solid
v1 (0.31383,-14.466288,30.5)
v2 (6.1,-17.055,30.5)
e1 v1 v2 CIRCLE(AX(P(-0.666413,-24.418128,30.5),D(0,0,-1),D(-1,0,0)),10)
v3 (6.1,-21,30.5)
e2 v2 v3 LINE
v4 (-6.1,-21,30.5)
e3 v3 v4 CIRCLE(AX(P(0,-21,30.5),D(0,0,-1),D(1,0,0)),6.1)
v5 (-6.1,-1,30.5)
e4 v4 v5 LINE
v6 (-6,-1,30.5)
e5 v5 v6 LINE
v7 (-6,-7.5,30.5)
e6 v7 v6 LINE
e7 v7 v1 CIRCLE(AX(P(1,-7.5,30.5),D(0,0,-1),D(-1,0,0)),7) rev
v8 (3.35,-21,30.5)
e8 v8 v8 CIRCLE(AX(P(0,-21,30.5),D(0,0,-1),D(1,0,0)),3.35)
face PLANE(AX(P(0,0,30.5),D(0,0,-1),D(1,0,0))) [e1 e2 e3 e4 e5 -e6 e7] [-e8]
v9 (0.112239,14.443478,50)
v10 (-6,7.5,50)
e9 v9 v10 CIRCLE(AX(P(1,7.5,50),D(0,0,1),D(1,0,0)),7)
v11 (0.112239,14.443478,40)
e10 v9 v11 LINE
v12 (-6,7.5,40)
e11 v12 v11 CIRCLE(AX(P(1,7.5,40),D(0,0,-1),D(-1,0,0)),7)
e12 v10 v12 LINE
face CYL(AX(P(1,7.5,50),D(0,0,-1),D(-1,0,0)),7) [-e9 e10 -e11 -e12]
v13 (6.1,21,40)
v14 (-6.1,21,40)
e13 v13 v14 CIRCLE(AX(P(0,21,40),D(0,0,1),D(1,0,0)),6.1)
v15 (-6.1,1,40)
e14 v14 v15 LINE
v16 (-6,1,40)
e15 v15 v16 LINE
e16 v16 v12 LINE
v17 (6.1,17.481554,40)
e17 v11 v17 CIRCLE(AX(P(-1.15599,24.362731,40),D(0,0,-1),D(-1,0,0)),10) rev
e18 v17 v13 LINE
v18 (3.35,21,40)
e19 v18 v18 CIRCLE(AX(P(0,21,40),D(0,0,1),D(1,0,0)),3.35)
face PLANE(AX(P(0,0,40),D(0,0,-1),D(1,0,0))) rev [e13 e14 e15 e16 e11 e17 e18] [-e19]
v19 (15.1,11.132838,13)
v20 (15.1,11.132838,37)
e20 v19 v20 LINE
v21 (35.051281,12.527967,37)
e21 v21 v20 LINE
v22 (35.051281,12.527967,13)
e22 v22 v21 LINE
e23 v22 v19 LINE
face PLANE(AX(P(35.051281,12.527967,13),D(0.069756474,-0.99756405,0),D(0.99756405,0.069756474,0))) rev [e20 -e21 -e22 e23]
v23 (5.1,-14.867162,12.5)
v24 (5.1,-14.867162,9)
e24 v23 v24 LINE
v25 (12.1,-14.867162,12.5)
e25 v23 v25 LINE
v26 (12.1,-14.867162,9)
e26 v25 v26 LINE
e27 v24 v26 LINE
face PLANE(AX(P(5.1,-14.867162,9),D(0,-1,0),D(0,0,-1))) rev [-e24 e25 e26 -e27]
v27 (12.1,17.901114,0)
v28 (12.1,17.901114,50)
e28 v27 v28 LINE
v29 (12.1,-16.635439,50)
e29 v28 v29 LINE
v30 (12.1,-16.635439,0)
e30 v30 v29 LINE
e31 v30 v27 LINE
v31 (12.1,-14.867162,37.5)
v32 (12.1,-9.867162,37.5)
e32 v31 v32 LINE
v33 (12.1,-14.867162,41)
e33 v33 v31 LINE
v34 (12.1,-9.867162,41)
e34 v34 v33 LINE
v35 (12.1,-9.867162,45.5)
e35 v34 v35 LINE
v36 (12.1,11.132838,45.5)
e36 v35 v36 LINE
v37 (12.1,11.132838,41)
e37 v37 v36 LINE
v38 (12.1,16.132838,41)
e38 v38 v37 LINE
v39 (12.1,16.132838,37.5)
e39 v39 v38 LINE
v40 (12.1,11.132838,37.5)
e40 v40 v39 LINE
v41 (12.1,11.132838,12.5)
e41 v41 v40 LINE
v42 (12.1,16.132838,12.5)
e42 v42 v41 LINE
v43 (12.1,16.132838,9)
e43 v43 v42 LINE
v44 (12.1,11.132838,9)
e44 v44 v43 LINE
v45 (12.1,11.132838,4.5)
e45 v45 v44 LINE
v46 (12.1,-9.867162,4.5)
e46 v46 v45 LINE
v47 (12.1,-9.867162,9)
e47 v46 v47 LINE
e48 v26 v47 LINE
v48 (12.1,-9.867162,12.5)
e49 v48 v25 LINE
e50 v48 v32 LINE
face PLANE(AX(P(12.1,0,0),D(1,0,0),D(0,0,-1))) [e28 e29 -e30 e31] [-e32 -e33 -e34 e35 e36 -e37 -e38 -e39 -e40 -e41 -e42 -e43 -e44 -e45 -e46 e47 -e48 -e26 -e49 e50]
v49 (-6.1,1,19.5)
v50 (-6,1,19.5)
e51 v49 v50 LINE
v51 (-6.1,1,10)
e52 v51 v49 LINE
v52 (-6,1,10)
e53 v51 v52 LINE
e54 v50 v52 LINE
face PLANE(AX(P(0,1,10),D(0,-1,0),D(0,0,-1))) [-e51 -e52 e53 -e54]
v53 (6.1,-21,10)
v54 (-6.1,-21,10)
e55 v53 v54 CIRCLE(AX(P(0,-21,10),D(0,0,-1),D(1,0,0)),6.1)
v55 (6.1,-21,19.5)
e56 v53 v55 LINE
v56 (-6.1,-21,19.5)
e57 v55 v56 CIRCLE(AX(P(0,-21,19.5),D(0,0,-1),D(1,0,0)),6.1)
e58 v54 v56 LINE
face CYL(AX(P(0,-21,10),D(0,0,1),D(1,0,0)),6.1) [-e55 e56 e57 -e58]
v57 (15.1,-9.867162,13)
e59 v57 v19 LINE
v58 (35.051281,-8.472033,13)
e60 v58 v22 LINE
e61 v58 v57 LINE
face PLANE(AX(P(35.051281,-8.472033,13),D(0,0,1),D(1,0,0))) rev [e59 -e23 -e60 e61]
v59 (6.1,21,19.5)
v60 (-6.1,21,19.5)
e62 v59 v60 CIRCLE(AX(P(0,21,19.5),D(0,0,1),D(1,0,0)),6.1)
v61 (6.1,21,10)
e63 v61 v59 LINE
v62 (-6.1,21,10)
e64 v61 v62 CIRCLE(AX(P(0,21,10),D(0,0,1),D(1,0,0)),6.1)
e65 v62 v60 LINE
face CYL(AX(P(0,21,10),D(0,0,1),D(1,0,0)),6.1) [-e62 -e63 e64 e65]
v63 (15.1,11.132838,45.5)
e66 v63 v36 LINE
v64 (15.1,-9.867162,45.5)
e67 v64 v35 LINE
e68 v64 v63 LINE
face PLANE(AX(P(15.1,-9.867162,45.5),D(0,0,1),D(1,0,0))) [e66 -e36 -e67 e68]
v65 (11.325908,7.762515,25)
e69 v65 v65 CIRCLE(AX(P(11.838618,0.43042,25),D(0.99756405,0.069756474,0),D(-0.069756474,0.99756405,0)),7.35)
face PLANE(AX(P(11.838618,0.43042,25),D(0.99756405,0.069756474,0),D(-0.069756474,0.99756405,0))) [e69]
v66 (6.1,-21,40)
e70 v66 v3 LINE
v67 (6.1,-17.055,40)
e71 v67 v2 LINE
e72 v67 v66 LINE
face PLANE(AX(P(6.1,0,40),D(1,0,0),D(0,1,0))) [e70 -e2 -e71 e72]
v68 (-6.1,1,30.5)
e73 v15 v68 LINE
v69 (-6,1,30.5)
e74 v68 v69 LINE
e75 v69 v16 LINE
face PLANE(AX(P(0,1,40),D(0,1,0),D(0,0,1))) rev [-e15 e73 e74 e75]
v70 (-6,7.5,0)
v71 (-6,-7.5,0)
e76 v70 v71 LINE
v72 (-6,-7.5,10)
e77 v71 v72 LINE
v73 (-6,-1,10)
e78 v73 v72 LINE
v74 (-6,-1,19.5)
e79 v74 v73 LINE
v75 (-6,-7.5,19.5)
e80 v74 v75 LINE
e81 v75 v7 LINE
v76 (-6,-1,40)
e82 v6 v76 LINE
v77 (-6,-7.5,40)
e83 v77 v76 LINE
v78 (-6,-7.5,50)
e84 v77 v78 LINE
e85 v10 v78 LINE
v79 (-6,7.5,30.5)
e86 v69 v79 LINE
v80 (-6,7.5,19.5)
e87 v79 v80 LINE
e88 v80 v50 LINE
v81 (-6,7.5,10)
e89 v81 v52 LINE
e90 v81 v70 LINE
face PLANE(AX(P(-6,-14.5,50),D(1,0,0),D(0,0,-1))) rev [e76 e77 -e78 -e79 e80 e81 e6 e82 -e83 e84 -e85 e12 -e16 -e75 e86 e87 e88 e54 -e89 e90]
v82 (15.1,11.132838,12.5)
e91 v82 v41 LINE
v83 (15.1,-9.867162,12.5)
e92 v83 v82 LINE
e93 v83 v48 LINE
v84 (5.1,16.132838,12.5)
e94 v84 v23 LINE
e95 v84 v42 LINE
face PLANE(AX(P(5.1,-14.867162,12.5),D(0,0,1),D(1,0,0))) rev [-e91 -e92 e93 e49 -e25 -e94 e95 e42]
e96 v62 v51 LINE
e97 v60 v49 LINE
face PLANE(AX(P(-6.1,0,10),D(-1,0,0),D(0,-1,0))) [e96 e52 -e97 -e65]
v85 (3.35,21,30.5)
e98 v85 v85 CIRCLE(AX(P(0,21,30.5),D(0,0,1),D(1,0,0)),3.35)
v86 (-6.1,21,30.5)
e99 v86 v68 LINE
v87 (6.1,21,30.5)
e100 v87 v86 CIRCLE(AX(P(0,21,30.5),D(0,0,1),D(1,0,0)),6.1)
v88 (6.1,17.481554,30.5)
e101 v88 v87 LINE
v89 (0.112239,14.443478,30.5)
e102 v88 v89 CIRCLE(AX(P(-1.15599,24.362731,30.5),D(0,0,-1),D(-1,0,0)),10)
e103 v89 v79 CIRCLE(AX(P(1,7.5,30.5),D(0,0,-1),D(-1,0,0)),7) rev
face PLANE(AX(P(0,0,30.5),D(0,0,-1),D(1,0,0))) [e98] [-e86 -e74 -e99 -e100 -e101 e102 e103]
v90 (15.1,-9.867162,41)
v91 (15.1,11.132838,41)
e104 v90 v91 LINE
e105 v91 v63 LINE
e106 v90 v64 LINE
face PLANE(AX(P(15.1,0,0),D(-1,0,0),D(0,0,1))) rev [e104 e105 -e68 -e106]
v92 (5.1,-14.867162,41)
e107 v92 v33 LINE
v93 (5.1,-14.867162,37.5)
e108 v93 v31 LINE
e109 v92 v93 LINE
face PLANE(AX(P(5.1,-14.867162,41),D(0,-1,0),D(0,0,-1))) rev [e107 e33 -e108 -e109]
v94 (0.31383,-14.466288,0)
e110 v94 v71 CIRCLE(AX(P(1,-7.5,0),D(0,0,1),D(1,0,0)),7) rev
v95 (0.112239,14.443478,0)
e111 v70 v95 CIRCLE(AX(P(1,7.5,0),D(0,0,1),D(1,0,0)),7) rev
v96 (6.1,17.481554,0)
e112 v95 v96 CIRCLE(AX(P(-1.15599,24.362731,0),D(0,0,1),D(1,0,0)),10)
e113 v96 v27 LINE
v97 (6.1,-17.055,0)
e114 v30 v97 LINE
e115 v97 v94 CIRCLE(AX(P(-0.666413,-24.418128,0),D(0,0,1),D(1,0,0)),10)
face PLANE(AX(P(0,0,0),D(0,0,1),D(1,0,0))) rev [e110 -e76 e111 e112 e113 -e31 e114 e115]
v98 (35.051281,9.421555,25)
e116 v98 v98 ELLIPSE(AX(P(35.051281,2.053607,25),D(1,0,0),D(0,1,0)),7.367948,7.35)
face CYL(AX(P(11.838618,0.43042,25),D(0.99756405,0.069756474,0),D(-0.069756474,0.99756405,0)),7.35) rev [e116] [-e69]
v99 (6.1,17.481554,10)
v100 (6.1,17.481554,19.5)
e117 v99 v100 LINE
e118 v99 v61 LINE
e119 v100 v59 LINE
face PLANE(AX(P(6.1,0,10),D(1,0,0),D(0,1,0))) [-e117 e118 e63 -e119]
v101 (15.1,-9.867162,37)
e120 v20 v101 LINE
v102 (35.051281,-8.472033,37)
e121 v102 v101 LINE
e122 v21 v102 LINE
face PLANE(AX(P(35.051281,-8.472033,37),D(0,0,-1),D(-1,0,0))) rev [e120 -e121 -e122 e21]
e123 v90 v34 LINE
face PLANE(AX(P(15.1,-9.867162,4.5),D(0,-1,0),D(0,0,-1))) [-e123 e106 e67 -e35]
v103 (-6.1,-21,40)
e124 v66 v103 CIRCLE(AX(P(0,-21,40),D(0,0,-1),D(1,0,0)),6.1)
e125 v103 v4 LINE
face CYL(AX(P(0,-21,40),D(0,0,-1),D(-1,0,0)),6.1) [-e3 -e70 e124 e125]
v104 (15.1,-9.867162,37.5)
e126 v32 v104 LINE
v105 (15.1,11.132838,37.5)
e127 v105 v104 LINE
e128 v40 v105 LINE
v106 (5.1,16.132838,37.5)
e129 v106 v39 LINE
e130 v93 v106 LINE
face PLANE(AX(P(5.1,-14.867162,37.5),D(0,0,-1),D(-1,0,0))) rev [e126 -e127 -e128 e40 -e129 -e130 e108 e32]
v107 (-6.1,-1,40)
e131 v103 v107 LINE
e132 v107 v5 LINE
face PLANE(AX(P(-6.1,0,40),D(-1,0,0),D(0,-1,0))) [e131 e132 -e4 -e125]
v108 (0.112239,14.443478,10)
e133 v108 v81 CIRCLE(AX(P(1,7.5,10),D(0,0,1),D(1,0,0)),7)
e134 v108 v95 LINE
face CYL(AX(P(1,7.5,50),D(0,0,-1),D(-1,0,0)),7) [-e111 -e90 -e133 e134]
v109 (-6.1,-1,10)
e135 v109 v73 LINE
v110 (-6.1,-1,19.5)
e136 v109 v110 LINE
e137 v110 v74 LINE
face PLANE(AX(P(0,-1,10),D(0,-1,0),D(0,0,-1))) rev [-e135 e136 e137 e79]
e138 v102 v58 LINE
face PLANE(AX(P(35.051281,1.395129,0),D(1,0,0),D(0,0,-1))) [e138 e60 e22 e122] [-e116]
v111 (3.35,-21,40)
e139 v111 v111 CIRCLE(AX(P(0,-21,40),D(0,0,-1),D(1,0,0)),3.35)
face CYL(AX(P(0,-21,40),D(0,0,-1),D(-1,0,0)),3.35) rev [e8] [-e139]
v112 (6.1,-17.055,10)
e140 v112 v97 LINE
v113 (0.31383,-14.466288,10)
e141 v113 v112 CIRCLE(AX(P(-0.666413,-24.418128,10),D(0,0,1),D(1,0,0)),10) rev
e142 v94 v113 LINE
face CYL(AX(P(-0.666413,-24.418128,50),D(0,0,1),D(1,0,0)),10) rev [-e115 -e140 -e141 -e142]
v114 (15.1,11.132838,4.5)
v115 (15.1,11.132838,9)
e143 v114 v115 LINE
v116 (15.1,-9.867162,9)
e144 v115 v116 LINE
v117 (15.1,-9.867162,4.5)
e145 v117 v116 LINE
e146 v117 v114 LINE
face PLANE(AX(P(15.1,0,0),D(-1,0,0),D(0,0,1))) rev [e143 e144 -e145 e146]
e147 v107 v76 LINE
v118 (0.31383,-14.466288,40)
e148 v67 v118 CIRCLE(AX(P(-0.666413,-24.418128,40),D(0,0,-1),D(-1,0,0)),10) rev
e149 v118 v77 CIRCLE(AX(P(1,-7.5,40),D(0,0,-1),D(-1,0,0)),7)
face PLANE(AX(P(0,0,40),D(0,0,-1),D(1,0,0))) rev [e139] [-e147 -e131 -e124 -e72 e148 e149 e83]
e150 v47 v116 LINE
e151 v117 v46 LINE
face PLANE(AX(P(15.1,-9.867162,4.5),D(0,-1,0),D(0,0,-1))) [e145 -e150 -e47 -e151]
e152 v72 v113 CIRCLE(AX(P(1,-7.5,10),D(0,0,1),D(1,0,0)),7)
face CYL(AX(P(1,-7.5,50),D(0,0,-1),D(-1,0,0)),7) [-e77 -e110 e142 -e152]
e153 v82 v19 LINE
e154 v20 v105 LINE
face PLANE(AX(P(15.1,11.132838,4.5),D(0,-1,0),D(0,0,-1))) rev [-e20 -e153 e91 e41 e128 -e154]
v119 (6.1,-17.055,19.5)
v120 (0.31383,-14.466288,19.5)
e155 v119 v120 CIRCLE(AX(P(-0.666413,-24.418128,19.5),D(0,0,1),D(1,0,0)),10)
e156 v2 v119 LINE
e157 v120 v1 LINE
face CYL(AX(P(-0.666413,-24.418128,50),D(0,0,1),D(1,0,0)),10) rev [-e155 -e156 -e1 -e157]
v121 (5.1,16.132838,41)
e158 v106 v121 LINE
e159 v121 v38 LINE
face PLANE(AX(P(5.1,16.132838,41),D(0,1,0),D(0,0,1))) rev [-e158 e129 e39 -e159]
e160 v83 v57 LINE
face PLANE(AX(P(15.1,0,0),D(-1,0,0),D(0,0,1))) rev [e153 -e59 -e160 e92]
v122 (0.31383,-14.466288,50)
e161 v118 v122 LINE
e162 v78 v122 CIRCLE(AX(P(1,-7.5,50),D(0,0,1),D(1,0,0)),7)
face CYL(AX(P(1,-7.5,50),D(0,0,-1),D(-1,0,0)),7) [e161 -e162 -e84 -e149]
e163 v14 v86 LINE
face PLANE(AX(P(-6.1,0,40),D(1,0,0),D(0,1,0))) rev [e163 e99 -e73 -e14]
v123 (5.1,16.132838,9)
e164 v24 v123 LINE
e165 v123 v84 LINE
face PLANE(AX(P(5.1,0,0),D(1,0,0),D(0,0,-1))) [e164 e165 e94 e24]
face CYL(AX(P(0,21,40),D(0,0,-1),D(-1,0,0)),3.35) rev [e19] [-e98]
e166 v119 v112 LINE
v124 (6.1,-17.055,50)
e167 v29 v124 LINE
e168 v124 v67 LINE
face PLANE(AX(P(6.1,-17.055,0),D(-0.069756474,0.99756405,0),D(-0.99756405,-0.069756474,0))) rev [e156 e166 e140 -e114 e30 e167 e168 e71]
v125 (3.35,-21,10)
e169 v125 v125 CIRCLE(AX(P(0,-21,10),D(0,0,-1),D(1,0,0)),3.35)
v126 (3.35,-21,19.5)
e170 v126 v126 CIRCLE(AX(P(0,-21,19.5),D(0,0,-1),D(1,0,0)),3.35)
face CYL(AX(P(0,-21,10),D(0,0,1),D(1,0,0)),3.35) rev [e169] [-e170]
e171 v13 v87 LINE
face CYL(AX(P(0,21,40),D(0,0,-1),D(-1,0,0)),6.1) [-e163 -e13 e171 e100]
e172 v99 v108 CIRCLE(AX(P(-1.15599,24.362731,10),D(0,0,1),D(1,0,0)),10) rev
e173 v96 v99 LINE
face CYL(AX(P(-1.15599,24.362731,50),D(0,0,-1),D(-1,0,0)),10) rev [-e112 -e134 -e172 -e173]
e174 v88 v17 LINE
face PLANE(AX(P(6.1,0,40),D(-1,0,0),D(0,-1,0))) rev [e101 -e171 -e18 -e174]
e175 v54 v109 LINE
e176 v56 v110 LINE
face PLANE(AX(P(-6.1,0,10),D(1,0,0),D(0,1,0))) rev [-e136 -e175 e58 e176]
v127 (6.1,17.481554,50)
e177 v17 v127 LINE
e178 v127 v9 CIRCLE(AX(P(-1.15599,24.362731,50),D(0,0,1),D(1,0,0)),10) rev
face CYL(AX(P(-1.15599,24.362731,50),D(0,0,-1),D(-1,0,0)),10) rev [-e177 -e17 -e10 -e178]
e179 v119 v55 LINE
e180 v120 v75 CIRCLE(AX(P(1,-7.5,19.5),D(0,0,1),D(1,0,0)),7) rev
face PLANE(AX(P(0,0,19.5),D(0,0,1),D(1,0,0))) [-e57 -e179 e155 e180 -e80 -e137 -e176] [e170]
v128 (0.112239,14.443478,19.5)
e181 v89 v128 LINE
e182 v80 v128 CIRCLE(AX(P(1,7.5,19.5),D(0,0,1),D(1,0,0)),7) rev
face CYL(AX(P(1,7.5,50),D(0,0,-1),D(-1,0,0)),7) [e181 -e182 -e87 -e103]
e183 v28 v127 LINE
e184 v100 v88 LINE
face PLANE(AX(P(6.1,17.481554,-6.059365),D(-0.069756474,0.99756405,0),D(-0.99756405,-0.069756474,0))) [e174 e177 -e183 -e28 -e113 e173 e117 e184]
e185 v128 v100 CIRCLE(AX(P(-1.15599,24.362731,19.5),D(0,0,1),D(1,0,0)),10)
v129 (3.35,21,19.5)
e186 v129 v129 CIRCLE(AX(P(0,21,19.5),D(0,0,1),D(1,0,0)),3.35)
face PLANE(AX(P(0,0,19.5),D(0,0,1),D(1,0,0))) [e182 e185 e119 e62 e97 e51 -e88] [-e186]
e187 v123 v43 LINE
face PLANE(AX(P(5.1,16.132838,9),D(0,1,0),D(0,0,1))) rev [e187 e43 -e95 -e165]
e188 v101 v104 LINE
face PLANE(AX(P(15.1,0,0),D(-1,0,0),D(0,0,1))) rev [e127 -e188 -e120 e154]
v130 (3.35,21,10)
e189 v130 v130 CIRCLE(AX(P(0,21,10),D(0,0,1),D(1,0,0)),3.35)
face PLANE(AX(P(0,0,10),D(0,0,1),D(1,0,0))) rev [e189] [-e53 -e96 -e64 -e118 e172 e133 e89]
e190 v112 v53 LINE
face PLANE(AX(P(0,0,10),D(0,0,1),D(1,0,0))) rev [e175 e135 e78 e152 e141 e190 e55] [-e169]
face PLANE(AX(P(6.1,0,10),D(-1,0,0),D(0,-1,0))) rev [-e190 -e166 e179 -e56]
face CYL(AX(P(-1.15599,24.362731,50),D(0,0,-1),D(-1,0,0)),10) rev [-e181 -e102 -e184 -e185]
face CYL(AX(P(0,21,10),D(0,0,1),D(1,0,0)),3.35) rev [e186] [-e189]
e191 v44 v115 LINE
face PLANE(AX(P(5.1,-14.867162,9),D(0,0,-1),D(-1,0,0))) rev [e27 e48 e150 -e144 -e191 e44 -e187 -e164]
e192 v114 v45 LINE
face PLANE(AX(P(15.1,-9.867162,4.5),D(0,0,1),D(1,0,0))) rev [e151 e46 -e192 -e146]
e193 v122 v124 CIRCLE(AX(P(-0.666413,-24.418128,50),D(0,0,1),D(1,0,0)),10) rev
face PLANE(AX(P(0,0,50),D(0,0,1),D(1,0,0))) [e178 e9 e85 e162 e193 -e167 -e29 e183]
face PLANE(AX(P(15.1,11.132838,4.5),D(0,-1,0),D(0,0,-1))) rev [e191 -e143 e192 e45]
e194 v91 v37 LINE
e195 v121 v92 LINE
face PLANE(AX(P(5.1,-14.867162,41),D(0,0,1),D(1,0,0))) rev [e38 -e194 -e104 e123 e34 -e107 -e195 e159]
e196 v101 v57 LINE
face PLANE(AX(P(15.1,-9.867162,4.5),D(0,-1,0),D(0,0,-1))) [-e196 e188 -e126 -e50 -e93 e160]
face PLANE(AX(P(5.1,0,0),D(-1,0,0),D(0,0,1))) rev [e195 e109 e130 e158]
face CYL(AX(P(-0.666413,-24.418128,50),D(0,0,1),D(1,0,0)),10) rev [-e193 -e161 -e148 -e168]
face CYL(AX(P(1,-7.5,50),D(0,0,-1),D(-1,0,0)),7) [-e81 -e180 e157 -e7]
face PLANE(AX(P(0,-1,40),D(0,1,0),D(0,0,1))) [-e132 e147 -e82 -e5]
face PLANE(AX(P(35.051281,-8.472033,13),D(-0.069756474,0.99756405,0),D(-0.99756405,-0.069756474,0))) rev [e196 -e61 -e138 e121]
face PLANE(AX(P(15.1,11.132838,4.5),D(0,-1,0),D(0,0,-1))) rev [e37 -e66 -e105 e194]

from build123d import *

# Parameters (mm, degrees)
SKETCH4_W               = 13
SKETCH4_H               = 29
BOSS_EXTRUDE1_DEPTH     = 50
SKETCH6_R               = 3.35
BOSS_EXTRUDE2_DEPTH     = 4.75
MIRROR2_COPY_1_SKETCH_R = 3.35
MIRROR2_COPY_1_DEPTH    = 4.75
FILLET2_R               = 7
SKETCH7_W               = 50
SKETCH7_H               = 34.11
BOSS_EXTRUDE3_DEPTH     = 6
BOSS_EXTRUDE4_REACH     = 60.145
CUT_EXTRUDE1_DEPTH      = 59.144819202
SKETCH10_W              = 41
SKETCH10_H              = 21
BOSS_EXTRUDE5_DEPTH     = 3
FILLET4_R               = 10
CUT_EXTRUDE2_DEPTH      = 60.713063897
CUT_EXTRUDE2_DEPTH_BACK = 7
SKETCH11_W              = 3.5
SKETCH11_H              = 31
SKETCH12_W              = 24
SKETCH12_H              = 21
BOSS_EXTRUDE7_DEPTH     = 20
SKETCH15_R              = 7.35
CUT_EXTRUDE3_DEPTH      = 24


with BuildPart() as part:
    # Sketch4 → Boss-Extrude1 (new body)
    with BuildSketch(Plane.XY):
        with Locations((0.5, 0)):
            Rectangle(SKETCH4_W, SKETCH4_H)
    extrude(amount=BOSS_EXTRUDE1_DEPTH)

    # Sketch6 → Boss-Extrude2 (add, symmetric)
    with BuildSketch(Plane.XY.offset(14.75)):
        with BuildLine():
            Line((6.1, 1), (6.1, 21))
            ThreePointArc((6.1, 21), (0, 27.1), (-6.1, 21))
            Line((-6.1, 21), (-6.1, 1))
            Line((-6.1, 1), (6.1, 1))
        make_face()
        with Locations((0, 21)):
            Circle(SKETCH6_R, mode=Mode.SUBTRACT)
    boss_extrude2 = extrude(amount=BOSS_EXTRUDE2_DEPTH, both=True)

    # Mirror1: Boss-Extrude2 across plane
    add(boss_extrude2.mirror(Plane.XY.offset(25)))

    # Mirror2: Boss-Extrude2 across plane
    add(boss_extrude2.mirror(Plane.ZX))

    # Mirror2 copy 1 sketch → Mirror2 copy 1 (add, symmetric)
    with BuildSketch(Plane(origin=(0, 0, 35.25), x_dir=(1, 0, 0), z_dir=(0, 0, -1))):
        with BuildLine():
            Line((6.1, 1), (6.1, 21))
            ThreePointArc((6.1, 21), (0, 27.1), (-6.1, 21))
            Line((-6.1, 21), (-6.1, 1))
            Line((-6.1, 1), (6.1, 1))
        make_face()
        with Locations((0, 21)):
            Circle(MIRROR2_COPY_1_SKETCH_R, mode=Mode.SUBTRACT)
    extrude(amount=MIRROR2_COPY_1_DEPTH, both=True)

    # Fillet2
    fillet2_edges = [part.edges().sort_by_distance(p)[0] for p in [
        (-6, 14.5, 5),
        (-6, 14.5, 25),
        (-6, -14.5, 5),
        (-6, -14.5, 25),
        (-6, 14.5, 45),
        (-6, -14.5, 45),
    ]]
    fillet(fillet2_edges, radius=FILLET2_R)

    # Sketch7 → Boss-Extrude3 (add)
    with BuildSketch(Plane(origin=(6.1, 0, 0), x_dir=(0, 0, -1), z_dir=(1, 0, 0))):
        with Locations((-25, 0)):
            Rectangle(SKETCH7_W, SKETCH7_H)
    extrude(amount=BOSS_EXTRUDE3_DEPTH)

    # Boss-Extrude4: up to this face of the body (flat: up to its plane)
    boss_extrude4_end = Plane(part.part.faces().sort_by_distance((3.691573852, 0, 0))[0])
    # Sketch8 → Boss-Extrude4 (add, up to the picked face)
    with BuildSketch(Plane.XY.offset(50), mode=Mode.PRIVATE) as boss_extrude4_sk1:
        Polygon((6.1, 17.481553553), (12.1, 17.901114425), (12.1, 17.055), (6.1, 17.055), align=None)
    boss_extrude4_tool1 = split(extrude(boss_extrude4_sk1.sketch, amount=-BOSS_EXTRUDE4_REACH, mode=Mode.PRIVATE), bisect_by=boss_extrude4_end, keep=Keep.BOTH, mode=Mode.PRIVATE)
    add(boss_extrude4_tool1.solids().sort_by(Axis((9.42967, 17.384693, 50), (0, 0, -1)))[0])

    # Sketch9 → Cut-Extrude1 (cut, through all)
    with BuildSketch(Plane.XY.offset(50)):
        Polygon((6.1, -17.055), (17.728439632, -16.241860289), (17.728439632, -20.144237666), (6.1, -20.144237666), align=None)
    extrude(amount=-CUT_EXTRUDE1_DEPTH, mode=Mode.SUBTRACT)

    # Sketch10 → Boss-Extrude5 (add)
    with BuildSketch(Plane(origin=(12.1, 0, 0), x_dir=(0, 0, -1), z_dir=(1, 0, 0))):
        with Locations((-25, 0.632837648)):
            Rectangle(SKETCH10_W, SKETCH10_H)
    extrude(amount=BOSS_EXTRUDE5_DEPTH)

    # Fillet4
    # the kernel refuses this fillet: 10 mm, written as the material it adds along each edge
    with BuildSketch(Plane(origin=(6.1, -14.5, 50), x_dir=(0, -1, 0), z_dir=(0, 0, -1))) as fillet4_piece_1:
        with BuildLine():
            CenterArc((9.918128411, 6.76641264), FILLET4_R, 185.625410645, 36.956323183)
            Line((-0.033711831, 5.78616991), (-1.028895855, 5.688145638))
            ThreePointArc((-1.028895855, 5.688145638), (-1, 5.1), (-1, 0))
            Line((-1, 0), (0, -1))
            ThreePointArc((0, -1), (1.2775, -1), (1.818687159, -0.676641264))
            Line((1.818687159, -0.676641264), (2.555, 0))
        make_face()
    extrude(amount=24.465670292)
    with BuildSketch(Plane(origin=(6.1, -14.5, 44.965670292), x_dir=(0, -1, 0), z_dir=(0, 0, -1))) as fillet4_piece_2:
        with BuildLine():
            CenterArc((9.918128411, 6.76641264), FILLET4_R, 185.625410645, 36.956323183)
            Line((-0.033711831, 5.78616991), (-1.028895855, 5.688145638))
            ThreePointArc((-1.028895855, 5.688145638), (-1, 5.1), (-1, 0))
            Line((-1, 0), (0, -1))
            ThreePointArc((0, -1), (1.2775, -1), (1.818687159, -0.676641264))
            Line((1.818687159, -0.676641264), (2.555, 0))
        make_face()
    extrude(amount=39.931340584)
    with BuildSketch(Plane(origin=(6.1, -14.5, 24.465670292), x_dir=(-0.9999830276779416, 0.005826178512287368, 0), z_dir=(0, 0, -1))) as fillet4_piece_3:
        with BuildLine():
            CenterArc((6.708513011, -9.957382405), FILLET4_R, 95.291593317, 36.956323183)
            Line((-0.014885886, -2.554956636), (-0.687225776, -1.814714059))
            ThreePointArc((-0.687225776, -1.814714059), (-1.007425971, -1.271652139), (-0.999983028, 0.005826179))
            Line((-0.999983028, 0.005826179), (0.005826179, 0.999983028))
            ThreePointArc((0.005826179, 0.999983028), (5.10573962, 0.970269517), (5.694043627, 0.99573824))
            Line((5.694043627, 0.99573824), (5.786268117, 0))
        make_face()
    extrude(amount=24.465670292)
    with BuildSketch(Plane(origin=(6.1, 14.5, 0), x_dir=(-0.9999554494088081, -0.009439237131707428, 0), z_dir=(0, 0, 1))) as fillet4_piece_4:
        with BuildLine():
            CenterArc((7.162570226, -9.930782909), FILLET4_R, 96.745204553, 39.23266057)
            Line((-0.028143591, -2.981420723), (-0.747214973, -2.286484504))
            ThreePointArc((-0.747214973, -2.286484504), (-1.014027245, -1.481271124), (-0.999955449, 0.009439237))
            Line((-0.999955449, 0.009439237), (0.009439237, 0.999955449))
            ThreePointArc((0.009439237, 0.999955449), (5.109212029, 0.95181534), (5.870573137, 0.993078291))
            Line((5.870573137, 0.993078291), (5.988027418, 0))
        make_face()
    extrude(amount=24.970068545)
    with BuildSketch(Plane(origin=(6.1, 14.5, 4.529931455), x_dir=(0, 1, 0), z_dir=(0, 0, 1))) as fillet4_piece_5:
        with BuildLine():
            CenterArc((9.862731288, 7.255990144), FILLET4_R, 187.286041034, 39.23266057)
            Line((-0.056522411, 5.987760648), (-1.048447781, 5.860937698))
            ThreePointArc((-1.048447781, 5.860937698), (-1, 5.1), (-1, 0))
            Line((-1, 0), (0, -1))
            ThreePointArc((0, -1), (1.490776776, -1), (2.293435779, -0.725599014))
            Line((2.293435779, -0.725599014), (2.981553553, 0))
        make_face()
    extrude(amount=40.940137089)
    with BuildSketch(Plane(origin=(6.1, 14.5, 25.029931455), x_dir=(0, 1, 0), z_dir=(0, 0, 1))) as fillet4_piece_6:
        with BuildLine():
            CenterArc((9.862731288, 7.255990144), FILLET4_R, 187.286041034, 39.23266057)
            Line((-0.056522411, 5.987760648), (-1.048447781, 5.860937698))
            ThreePointArc((-1.048447781, 5.860937698), (-1, 5.1), (-1, 0))
            Line((-1, 0), (0, -1))
            ThreePointArc((0, -1), (1.490776776, -1), (2.293435779, -0.725599014))
            Line((2.293435779, -0.725599014), (2.981553553, 0))
        make_face()
    extrude(amount=24.970068545)

    # Sketch11 → Cut-Extrude2 (cut, two sides: drawn at the far end of the back side and taken through both)
    with BuildSketch(Plane(origin=(12.1, 0, 0), x_dir=(0, 0, -1), z_dir=(1, 0, 0)).offset(-CUT_EXTRUDE2_DEPTH_BACK)):
        with Locations((-10.75, 0.632837648)):
            Rectangle(SKETCH11_W, SKETCH11_H)
        with Locations((-39.25, 0.632837648)):
            Rectangle(SKETCH11_W, SKETCH11_H)
    extrude(amount=CUT_EXTRUDE2_DEPTH + CUT_EXTRUDE2_DEPTH_BACK, mode=Mode.SUBTRACT)

    # Sketch12 → Boss-Extrude7 (add, along a direction that is not the sketch's normal)
    with BuildSketch(Plane(origin=(15.1, 0, 0), x_dir=(0, 0, -1), z_dir=(1, 0, 0))):
        with Locations((-25, 0.632837648)):
            Rectangle(SKETCH12_W, SKETCH12_H)
    extrude(amount=BOSS_EXTRUDE7_DEPTH, dir=(0.9975640502598245, 0.069756473744122, 0))

    # Sketch15 → Cut-Extrude3 (cut)
    with BuildSketch(Plane(origin=(35.752500693, 2.500058392, 0), x_dir=(0, 0, -1), z_dir=(0.9975640502598246, 0.06975647374412185, 0))):
        with Locations(Location((-25, -0.396449194, 0), (0, 0, 90))):
            Circle(SKETCH15_R)
    extrude(amount=-CUT_EXTRUDE3_DEPTH, mode=Mode.SUBTRACT)


solid = part.part
